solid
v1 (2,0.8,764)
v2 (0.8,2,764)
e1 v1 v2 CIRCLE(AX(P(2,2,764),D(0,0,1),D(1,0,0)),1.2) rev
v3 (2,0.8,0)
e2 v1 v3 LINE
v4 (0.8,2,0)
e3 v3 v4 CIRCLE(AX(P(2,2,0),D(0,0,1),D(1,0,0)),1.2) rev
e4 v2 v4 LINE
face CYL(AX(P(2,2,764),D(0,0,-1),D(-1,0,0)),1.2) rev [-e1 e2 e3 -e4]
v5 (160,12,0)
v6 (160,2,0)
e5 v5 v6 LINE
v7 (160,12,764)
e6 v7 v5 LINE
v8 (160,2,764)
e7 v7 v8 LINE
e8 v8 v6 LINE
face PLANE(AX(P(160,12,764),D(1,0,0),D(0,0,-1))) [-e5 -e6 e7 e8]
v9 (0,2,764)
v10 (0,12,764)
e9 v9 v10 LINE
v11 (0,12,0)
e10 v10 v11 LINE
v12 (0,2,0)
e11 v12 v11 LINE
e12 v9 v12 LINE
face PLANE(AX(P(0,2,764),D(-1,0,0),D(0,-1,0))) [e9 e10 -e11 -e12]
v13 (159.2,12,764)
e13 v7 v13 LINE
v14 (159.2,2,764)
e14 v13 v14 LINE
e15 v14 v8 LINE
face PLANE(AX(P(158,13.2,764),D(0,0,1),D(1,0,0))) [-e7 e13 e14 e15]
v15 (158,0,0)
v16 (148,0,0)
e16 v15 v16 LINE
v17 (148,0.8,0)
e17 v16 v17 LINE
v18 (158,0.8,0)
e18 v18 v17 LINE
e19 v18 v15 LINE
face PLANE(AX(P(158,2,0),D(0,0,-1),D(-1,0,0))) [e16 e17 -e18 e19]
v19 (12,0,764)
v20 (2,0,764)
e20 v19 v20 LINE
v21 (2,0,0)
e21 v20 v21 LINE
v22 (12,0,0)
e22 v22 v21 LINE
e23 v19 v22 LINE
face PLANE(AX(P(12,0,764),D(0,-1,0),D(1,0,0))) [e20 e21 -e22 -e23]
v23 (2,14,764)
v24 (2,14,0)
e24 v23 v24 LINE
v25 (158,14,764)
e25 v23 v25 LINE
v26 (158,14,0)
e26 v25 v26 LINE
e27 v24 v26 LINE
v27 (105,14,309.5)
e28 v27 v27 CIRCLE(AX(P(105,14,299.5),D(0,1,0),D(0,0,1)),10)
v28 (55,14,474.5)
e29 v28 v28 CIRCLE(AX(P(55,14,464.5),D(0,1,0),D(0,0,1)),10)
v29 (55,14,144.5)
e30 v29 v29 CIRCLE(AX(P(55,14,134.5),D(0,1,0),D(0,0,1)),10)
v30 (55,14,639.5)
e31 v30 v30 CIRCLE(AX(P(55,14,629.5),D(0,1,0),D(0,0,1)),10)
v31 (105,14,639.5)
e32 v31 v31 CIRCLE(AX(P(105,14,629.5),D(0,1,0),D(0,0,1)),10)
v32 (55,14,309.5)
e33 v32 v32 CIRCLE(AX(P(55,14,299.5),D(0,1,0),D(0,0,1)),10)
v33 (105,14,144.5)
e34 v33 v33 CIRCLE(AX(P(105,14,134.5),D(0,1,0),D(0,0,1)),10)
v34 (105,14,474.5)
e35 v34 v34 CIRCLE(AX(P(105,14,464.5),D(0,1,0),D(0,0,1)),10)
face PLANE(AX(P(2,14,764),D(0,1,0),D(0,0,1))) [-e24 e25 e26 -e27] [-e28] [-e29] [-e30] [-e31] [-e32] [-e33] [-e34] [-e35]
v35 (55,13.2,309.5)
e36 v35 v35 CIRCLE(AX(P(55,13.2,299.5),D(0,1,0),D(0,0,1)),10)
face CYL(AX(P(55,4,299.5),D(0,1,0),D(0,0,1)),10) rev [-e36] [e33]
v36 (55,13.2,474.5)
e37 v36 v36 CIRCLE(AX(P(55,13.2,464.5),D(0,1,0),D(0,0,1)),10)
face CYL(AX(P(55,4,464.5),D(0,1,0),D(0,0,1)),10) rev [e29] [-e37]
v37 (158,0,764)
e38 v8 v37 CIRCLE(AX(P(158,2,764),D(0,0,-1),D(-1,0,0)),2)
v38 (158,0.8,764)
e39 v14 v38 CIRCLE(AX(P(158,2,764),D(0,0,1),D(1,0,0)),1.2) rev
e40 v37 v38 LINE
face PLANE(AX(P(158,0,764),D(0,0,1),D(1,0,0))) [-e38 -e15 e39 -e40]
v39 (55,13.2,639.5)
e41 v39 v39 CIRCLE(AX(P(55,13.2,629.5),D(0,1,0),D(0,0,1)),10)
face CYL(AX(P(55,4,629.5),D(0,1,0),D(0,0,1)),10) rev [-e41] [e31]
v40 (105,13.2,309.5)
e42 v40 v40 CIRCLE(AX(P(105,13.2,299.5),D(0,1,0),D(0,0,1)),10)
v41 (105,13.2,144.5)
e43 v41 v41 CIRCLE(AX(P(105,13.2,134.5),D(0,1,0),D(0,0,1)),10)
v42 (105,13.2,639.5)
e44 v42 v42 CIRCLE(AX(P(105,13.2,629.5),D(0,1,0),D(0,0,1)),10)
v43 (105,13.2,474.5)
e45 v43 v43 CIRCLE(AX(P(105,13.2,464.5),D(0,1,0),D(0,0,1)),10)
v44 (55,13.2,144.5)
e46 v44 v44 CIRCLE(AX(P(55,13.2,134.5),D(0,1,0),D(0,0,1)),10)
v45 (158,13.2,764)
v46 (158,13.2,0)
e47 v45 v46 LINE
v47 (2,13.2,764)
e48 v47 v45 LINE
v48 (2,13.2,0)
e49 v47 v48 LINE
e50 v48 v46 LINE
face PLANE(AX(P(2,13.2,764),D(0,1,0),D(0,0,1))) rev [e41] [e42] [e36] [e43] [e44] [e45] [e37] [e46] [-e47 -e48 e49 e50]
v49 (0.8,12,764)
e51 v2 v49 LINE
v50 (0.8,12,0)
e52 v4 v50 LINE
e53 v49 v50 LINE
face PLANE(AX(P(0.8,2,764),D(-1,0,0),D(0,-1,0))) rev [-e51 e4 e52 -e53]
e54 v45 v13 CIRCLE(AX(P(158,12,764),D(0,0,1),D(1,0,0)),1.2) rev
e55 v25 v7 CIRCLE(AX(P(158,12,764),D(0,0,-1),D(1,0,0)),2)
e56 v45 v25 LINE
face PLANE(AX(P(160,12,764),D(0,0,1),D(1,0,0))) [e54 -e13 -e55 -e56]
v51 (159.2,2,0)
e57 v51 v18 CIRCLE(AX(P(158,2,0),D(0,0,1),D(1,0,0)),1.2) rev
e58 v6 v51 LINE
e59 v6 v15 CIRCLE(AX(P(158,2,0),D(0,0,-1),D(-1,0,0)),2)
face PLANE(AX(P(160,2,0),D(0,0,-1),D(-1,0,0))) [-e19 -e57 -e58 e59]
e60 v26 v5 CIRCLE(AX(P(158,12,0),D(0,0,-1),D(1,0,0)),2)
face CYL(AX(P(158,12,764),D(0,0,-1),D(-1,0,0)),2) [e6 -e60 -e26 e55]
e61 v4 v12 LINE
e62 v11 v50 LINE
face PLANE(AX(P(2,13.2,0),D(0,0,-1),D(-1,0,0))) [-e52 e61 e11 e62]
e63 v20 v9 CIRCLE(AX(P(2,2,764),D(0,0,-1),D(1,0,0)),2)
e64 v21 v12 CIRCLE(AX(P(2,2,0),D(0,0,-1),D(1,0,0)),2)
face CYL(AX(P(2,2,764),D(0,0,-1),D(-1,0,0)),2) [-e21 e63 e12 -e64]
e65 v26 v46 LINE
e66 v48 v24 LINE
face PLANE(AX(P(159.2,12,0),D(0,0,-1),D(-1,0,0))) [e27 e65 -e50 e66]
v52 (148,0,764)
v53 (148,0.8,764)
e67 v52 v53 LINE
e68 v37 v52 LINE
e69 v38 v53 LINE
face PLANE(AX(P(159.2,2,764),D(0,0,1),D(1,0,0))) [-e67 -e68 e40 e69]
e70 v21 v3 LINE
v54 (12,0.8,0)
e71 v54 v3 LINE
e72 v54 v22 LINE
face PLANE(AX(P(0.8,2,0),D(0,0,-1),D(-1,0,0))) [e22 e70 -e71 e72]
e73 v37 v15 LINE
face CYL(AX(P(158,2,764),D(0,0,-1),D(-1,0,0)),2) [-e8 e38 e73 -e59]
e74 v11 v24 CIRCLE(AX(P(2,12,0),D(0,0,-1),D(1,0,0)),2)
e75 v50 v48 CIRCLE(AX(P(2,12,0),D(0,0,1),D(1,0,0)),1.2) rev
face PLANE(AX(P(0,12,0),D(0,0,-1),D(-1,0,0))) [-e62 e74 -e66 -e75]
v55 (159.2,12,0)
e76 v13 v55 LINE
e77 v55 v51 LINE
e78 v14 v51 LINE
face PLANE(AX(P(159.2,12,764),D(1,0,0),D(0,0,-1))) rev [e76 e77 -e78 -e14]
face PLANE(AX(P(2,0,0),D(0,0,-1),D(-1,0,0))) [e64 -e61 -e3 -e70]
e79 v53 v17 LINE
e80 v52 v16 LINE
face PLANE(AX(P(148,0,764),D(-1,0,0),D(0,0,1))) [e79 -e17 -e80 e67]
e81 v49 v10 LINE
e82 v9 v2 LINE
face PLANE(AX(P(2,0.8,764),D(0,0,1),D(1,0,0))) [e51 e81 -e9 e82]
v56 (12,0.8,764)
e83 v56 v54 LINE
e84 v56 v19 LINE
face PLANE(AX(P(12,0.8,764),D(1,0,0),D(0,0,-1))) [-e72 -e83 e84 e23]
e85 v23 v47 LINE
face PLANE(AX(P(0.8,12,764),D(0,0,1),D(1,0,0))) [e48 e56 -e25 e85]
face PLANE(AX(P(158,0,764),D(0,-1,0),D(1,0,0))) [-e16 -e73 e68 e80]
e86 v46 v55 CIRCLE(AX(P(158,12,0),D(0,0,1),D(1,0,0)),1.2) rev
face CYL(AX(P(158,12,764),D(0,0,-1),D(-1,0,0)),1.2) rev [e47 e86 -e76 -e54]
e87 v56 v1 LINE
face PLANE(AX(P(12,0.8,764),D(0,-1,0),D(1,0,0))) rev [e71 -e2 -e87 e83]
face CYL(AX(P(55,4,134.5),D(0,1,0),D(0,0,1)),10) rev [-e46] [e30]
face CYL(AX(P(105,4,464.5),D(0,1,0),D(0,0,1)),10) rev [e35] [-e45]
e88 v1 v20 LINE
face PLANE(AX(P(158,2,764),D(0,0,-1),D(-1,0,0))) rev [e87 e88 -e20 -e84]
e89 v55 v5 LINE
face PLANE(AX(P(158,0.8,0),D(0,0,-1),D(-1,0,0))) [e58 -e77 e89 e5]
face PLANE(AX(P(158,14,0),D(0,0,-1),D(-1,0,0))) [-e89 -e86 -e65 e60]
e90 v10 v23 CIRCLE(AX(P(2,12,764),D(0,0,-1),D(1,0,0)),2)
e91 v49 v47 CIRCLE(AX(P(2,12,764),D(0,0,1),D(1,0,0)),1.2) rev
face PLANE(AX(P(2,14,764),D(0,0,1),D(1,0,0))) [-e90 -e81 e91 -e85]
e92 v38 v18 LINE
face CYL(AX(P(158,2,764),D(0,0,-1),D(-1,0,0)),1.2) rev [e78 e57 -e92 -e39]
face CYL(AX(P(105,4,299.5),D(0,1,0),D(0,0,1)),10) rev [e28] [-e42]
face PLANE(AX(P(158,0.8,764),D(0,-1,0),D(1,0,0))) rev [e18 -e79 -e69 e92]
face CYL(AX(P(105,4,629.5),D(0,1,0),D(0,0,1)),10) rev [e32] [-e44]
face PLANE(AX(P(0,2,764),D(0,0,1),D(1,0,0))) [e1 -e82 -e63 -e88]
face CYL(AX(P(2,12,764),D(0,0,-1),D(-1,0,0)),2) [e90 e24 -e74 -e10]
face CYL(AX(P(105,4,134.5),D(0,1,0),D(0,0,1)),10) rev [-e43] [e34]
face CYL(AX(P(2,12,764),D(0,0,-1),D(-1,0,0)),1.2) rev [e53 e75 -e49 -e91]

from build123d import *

# Parameters (mm, degrees)
BASE_FLANGE1_DEPTH = 764
SKETCH6_R          = 10
CUT_EXTRUDE1_DEPTH = 10


# Sheet-metal steps are written as plain solids
with BuildPart() as part:
    # Sketch1 → Base-Flange1 (new body)
    with BuildSketch(Plane.XY):
        with BuildLine():
            Line((12, 0), (2, 0))
            ThreePointArc((2, 0), (0.585786438, 0.585786438), (0, 2))
            Line((0, 2), (0, 12))
            ThreePointArc((0, 12), (0.585786438, 13.414213562), (2, 14))
            Line((2, 14), (158, 14))
            ThreePointArc((158, 14), (159.414213562, 13.414213562), (160, 12))
            Line((160, 12), (160, 2))
            ThreePointArc((160, 2), (159.414213562, 0.585786438), (158, 0))
            Line((158, 0), (148, 0))
            Line((148, 0), (148, 0.8))
            Line((148, 0.8), (158, 0.8))
            ThreePointArc((158, 0.8), (158.848528137, 1.151471863), (159.2, 2))
            Line((159.2, 2), (159.2, 12))
            ThreePointArc((159.2, 12), (158.848528137, 12.848528137), (158, 13.2))
            Line((158, 13.2), (2, 13.2))
            ThreePointArc((2, 13.2), (1.151471863, 12.848528137), (0.8, 12))
            Line((0.8, 12), (0.8, 2))
            ThreePointArc((0.8, 2), (1.151471863, 1.151471863), (2, 0.8))
            Line((2, 0.8), (12, 0.8))
            Line((12, 0.8), (12, 0))
        make_face()
    extrude(amount=BASE_FLANGE1_DEPTH)

    # Sketch6 → Cut-Extrude1 (cut)
    with BuildSketch(Plane(origin=(0, 14, 0), x_dir=(1, 0, 0), z_dir=(0, 1, 0))):
        with Locations(Location((105, -299.5, 0), (0, 0, 270))):
            Circle(SKETCH6_R)
        with Locations(Location((105, -134.5, 0), (0, 0, 270))):
            Circle(SKETCH6_R)
        with Locations(Location((105, -464.5, 0), (0, 0, 270))):
            Circle(SKETCH6_R)
        with Locations(Location((105, -629.5, 0), (0, 0, 270))):
            Circle(SKETCH6_R)
        with Locations(Location((55, -629.5, 0), (0, 0, 270))):
            Circle(SKETCH6_R)
        with Locations(Location((55, -464.5, 0), (0, 0, 270))):
            Circle(SKETCH6_R)
        with Locations(Location((55, -299.5, 0), (0, 0, 270))):
            Circle(SKETCH6_R)
        with Locations(Location((55, -134.5, 0), (0, 0, 270))):
            Circle(SKETCH6_R)
    extrude(amount=-CUT_EXTRUDE1_DEPTH, mode=Mode.SUBTRACT)


solid = part.part
